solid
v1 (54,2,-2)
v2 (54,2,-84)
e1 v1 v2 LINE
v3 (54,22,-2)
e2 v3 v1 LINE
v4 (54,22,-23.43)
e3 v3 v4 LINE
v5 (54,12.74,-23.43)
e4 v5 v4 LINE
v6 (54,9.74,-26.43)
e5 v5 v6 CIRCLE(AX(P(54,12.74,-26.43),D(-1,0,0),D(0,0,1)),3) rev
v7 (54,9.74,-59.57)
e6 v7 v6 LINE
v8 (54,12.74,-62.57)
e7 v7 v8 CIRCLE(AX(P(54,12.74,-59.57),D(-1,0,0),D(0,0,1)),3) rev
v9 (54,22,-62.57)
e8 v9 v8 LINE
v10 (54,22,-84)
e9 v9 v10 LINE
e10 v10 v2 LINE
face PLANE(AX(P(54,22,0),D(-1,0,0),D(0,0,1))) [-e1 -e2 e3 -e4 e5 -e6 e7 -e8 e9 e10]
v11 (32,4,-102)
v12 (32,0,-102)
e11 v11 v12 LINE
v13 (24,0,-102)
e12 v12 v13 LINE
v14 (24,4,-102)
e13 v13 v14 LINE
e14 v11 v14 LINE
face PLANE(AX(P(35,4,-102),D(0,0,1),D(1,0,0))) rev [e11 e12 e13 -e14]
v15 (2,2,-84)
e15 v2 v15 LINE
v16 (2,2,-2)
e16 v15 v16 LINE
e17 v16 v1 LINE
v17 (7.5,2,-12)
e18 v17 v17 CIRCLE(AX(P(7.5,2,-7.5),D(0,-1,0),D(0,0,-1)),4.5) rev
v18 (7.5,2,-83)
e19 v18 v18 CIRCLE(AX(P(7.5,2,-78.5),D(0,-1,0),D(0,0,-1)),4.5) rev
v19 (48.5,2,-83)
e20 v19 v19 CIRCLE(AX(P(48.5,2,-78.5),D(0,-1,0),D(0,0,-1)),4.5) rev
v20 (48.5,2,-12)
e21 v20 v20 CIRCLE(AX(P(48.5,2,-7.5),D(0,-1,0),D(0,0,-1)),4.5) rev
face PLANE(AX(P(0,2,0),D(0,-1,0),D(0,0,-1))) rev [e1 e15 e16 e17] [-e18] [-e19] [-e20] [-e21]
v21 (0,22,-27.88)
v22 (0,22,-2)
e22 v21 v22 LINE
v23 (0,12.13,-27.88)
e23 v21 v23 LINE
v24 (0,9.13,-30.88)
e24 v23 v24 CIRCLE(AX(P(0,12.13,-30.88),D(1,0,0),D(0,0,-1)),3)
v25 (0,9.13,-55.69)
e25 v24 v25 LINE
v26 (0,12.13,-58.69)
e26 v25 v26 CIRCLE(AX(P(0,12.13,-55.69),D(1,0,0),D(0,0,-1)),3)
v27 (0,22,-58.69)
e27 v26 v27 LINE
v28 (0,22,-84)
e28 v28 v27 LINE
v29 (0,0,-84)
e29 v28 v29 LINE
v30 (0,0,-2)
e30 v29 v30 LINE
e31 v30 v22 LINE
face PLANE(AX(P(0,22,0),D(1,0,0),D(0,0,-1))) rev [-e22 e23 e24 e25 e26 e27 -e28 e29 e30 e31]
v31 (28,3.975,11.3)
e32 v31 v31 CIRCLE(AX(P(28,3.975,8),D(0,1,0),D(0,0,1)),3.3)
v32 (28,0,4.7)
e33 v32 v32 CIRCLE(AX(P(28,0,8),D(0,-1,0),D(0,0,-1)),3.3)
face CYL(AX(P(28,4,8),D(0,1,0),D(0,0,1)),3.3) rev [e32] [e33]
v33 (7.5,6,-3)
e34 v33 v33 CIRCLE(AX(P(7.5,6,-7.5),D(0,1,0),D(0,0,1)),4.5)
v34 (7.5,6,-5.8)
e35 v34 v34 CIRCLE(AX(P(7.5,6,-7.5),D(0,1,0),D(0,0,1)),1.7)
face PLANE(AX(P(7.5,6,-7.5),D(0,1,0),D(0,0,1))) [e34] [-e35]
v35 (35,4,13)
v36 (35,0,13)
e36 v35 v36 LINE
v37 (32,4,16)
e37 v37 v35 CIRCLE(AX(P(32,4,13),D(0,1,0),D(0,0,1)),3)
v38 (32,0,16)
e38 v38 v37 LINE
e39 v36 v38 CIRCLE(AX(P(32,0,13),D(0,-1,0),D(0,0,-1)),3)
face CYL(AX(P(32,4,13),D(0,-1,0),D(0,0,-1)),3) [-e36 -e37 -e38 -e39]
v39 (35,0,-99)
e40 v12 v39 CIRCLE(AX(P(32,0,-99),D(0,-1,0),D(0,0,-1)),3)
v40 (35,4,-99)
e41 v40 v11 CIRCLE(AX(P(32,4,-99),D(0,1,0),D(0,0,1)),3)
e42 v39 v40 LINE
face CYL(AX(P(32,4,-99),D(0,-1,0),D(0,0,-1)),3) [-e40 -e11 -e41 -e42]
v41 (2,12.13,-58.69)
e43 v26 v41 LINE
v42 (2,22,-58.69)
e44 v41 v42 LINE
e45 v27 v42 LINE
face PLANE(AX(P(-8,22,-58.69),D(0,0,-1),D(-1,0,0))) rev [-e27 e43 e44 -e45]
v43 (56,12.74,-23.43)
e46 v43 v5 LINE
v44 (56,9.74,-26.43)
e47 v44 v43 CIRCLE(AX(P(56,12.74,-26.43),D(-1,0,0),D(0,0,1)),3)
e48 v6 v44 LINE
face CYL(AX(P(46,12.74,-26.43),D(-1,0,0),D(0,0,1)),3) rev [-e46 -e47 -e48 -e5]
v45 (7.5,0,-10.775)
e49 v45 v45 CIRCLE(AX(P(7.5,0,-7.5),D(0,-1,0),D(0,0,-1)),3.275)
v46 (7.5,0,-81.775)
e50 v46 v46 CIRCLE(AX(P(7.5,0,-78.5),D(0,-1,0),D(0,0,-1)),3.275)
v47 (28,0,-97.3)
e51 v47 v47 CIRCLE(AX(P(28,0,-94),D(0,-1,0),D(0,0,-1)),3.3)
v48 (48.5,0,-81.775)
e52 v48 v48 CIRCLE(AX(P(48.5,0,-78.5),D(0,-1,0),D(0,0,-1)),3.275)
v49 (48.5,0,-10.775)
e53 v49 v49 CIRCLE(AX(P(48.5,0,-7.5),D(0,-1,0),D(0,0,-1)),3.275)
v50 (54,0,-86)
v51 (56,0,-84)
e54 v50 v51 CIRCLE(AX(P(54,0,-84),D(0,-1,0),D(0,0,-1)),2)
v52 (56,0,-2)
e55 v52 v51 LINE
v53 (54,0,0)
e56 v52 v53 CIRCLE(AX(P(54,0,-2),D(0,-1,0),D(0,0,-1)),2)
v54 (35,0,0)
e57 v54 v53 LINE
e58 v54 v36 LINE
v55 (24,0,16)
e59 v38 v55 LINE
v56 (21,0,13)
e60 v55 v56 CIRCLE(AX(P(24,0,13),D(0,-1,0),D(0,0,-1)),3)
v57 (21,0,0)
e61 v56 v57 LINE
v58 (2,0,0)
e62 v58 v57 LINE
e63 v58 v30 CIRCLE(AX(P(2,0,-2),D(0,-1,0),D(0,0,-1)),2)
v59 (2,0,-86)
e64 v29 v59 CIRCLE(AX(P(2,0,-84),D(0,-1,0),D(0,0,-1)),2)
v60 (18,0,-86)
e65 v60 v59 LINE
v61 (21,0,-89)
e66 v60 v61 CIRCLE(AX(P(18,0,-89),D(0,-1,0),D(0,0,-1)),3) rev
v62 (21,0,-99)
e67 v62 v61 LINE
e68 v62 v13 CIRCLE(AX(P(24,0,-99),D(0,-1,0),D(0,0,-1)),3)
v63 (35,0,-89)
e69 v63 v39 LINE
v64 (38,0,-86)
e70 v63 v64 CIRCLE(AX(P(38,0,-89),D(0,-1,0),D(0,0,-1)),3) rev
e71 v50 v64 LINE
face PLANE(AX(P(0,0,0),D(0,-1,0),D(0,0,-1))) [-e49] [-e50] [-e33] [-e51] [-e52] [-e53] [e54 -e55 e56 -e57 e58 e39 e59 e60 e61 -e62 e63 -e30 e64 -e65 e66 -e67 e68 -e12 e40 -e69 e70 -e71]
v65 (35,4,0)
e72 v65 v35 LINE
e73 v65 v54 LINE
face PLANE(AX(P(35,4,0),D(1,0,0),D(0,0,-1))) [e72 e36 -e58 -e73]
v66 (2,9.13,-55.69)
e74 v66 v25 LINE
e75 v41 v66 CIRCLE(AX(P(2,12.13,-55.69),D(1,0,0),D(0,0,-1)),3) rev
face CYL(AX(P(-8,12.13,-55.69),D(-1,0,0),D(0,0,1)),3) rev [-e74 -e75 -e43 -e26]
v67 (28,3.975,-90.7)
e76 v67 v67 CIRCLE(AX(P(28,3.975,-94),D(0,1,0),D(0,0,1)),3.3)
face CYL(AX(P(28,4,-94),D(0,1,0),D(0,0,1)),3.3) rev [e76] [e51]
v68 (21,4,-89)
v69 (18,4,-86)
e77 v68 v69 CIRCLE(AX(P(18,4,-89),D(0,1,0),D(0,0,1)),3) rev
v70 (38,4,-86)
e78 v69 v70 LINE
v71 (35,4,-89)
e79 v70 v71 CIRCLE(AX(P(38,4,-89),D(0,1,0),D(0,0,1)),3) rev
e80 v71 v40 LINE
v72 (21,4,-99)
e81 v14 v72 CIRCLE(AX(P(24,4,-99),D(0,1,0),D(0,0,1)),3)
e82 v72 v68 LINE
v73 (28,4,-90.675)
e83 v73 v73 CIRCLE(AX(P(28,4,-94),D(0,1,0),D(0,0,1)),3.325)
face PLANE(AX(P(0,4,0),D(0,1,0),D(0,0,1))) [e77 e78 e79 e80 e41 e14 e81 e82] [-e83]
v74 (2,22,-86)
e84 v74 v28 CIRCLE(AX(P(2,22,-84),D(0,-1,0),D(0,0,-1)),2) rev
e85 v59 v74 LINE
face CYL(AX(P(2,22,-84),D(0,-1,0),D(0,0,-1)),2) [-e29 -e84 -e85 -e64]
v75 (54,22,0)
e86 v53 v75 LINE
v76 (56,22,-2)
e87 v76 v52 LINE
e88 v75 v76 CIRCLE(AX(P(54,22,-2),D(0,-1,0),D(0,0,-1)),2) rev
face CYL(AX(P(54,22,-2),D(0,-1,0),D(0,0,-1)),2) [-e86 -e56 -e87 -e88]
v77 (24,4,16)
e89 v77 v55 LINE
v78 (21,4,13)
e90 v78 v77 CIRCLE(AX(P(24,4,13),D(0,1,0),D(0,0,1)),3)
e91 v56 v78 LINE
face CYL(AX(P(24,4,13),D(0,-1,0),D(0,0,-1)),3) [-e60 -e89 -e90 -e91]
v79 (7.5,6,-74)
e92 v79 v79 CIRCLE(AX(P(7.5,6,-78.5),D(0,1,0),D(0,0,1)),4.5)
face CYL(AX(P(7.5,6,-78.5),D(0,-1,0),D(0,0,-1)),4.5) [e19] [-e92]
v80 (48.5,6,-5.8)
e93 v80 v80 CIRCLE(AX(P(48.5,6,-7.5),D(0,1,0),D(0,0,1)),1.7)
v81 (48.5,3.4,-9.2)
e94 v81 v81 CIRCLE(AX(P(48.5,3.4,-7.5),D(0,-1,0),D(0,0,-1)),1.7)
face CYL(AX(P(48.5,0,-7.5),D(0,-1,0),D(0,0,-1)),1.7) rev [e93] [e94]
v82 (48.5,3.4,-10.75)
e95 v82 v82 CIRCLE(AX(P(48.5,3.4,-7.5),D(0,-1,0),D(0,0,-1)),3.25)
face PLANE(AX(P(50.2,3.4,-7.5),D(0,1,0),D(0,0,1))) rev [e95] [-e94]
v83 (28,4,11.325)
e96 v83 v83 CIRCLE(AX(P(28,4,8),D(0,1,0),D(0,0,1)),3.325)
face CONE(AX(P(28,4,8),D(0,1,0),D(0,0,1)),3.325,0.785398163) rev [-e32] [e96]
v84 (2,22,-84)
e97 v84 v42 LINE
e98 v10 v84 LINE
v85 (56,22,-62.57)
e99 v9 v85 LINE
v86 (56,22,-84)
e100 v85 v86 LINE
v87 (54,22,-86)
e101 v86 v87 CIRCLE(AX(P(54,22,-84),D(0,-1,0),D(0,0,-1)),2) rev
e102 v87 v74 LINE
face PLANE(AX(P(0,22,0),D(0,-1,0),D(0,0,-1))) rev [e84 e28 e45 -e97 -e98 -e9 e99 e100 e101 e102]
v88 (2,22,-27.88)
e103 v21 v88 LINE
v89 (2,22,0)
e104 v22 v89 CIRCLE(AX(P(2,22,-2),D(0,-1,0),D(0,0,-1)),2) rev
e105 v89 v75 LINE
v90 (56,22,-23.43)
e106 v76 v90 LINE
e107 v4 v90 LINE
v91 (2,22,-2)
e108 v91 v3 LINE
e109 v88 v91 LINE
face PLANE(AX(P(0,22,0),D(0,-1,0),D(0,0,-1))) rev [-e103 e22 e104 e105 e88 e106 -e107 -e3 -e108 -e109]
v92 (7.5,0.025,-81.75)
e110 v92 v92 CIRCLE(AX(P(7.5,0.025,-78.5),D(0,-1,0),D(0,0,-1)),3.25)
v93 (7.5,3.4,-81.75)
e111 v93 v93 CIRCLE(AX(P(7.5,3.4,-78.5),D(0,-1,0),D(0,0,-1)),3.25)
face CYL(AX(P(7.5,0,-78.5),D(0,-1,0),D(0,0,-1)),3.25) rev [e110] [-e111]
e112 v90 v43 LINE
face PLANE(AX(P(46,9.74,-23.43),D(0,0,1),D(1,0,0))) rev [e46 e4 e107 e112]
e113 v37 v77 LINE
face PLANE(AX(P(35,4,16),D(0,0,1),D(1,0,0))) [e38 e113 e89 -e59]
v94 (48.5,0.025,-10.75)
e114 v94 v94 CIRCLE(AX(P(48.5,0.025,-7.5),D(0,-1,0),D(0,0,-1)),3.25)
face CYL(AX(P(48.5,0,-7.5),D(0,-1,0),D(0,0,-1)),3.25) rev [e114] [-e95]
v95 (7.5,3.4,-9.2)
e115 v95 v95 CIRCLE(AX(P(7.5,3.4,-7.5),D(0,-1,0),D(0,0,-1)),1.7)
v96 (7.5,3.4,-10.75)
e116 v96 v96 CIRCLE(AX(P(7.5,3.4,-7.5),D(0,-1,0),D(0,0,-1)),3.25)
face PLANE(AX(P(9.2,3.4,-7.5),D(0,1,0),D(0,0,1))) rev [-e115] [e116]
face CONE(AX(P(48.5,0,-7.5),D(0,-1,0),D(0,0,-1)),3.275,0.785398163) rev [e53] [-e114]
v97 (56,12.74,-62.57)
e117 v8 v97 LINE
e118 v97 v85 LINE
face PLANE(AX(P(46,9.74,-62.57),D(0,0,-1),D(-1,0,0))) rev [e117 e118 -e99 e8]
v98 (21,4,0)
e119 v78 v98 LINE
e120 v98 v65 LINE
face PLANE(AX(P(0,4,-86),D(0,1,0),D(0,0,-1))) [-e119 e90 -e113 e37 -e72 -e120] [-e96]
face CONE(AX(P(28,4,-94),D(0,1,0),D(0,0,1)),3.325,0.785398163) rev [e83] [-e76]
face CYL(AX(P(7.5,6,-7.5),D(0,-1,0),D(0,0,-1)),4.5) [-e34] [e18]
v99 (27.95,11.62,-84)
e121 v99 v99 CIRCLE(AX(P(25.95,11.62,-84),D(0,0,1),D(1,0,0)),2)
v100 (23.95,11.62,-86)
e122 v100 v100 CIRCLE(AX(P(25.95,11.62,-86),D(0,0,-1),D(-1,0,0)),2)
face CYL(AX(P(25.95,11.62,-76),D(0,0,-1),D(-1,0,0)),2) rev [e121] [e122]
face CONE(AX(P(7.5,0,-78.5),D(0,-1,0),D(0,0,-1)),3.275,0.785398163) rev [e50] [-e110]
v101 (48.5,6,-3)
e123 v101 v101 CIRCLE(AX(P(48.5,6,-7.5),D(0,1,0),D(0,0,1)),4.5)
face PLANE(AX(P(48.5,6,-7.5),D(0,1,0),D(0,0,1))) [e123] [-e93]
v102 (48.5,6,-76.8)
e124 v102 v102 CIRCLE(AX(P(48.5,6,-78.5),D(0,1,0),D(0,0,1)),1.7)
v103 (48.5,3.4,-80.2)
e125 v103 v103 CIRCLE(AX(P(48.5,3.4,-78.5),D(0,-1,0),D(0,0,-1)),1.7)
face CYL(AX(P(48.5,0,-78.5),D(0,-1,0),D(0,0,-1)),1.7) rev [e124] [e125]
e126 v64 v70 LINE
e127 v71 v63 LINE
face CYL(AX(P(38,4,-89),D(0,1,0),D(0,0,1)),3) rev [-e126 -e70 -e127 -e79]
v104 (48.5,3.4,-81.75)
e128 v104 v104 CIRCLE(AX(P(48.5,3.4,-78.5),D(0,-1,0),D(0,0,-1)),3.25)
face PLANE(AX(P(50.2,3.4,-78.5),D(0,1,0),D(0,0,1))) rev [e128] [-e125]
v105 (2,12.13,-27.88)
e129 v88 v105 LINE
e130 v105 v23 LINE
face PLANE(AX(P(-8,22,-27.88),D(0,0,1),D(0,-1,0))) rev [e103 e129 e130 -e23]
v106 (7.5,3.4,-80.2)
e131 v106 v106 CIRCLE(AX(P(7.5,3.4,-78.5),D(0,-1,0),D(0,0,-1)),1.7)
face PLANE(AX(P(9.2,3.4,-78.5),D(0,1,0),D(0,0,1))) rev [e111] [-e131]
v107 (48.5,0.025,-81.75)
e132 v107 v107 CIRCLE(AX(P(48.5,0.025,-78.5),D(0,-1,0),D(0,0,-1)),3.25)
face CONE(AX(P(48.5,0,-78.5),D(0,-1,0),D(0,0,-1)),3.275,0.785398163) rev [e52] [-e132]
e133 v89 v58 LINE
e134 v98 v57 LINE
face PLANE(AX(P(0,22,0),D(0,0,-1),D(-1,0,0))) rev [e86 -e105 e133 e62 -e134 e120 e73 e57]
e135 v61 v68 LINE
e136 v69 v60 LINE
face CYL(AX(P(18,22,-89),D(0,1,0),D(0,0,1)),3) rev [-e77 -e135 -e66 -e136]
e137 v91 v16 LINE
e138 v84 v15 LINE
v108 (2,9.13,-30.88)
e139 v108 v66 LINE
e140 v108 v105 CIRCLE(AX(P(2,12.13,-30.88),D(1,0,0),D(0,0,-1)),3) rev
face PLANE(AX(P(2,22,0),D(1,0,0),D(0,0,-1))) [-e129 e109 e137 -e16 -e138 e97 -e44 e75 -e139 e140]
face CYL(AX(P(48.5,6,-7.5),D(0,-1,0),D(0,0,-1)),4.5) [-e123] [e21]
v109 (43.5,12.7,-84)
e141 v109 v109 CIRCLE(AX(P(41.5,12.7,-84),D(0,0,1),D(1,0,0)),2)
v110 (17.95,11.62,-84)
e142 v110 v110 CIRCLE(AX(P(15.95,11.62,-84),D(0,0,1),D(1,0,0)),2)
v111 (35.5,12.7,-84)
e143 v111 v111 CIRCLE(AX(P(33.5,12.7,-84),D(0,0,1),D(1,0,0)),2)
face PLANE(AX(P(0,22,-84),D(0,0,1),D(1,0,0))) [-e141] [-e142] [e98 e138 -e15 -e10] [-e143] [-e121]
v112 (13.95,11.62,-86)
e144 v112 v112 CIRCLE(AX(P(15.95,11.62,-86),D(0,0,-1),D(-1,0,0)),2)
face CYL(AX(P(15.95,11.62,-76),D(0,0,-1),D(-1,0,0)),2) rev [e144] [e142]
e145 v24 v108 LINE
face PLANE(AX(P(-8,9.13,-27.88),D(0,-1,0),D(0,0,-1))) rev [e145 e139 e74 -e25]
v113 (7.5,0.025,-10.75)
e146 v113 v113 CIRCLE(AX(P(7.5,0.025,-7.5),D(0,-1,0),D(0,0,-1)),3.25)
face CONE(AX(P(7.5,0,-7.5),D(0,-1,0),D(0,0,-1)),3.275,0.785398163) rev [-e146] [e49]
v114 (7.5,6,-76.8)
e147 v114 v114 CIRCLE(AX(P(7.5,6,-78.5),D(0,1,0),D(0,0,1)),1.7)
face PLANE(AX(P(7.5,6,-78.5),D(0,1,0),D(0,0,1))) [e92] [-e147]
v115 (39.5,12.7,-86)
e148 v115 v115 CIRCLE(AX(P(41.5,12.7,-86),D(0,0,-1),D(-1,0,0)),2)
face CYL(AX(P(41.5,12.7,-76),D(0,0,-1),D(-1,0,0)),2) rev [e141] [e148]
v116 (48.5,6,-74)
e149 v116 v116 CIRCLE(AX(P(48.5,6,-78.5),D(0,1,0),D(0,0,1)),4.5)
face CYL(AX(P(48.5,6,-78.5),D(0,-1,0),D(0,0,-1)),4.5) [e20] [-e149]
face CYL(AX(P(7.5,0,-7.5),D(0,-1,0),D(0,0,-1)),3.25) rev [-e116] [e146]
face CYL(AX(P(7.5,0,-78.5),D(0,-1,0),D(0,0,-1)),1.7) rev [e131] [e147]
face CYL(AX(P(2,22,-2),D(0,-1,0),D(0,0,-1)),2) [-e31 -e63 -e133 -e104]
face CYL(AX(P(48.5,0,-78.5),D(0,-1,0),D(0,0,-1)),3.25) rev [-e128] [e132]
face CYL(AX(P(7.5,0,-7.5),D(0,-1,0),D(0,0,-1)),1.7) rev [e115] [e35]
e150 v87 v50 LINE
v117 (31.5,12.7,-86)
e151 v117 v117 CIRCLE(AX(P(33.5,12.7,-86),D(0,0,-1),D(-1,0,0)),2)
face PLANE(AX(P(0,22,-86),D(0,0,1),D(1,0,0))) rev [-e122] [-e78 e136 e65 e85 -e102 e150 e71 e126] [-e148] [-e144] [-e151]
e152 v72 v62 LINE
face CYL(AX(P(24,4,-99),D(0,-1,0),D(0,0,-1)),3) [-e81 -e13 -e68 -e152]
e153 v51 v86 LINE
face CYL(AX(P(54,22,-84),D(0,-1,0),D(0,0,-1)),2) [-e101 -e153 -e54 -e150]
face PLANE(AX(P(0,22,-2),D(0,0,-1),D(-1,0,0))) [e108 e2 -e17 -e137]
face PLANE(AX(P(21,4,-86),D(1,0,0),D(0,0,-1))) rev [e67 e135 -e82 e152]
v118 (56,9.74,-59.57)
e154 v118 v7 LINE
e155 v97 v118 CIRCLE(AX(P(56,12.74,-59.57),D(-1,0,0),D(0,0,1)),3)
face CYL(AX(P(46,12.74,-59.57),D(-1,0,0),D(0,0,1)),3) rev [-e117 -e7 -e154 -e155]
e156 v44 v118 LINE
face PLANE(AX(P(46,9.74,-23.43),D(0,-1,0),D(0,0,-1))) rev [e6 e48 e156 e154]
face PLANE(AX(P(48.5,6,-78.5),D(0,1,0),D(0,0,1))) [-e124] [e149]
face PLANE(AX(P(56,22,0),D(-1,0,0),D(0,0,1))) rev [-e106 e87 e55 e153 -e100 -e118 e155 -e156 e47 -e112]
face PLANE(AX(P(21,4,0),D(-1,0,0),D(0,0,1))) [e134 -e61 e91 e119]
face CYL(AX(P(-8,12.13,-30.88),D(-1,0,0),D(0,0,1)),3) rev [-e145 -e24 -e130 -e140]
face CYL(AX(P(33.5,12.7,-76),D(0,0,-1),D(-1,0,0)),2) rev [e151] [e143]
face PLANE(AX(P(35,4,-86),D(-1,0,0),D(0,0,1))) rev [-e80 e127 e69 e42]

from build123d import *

# Parameters (mm, degrees)
SKIZZE1_W                                    = 56
SKIZZE1_H                                    = 86
AUFSATZ_LINEAR_AUSTRAGEN1_DEPTH              = 22
WANDUNG1_T                                   = -2
SKIZZE2_R                                    = 4.5
AUFSATZ_LINEAR_AUSTRAGEN2_DEPTH              = 4
VERRUNDUNG1_R                                = 2
STIRNSENKUNG_F_R_M3_ZYLINDERSCHRAUBE_2_COUNT = 2
STIRNSENKUNG_F_R_M3_ZYLINDERSCHRAUBE_2_PITCH = 81.987803971
STIRNSENKUNG_F_R_M3_ZYLINDERSCHRAUBE_3_COUNT = 2
STIRNSENKUNG_F_R_M3_ZYLINDERSCHRAUBE_3_PITCH = 71
STIRNSENKUNG_F_R_M3_ZYLINDERSCHRAUBE_4_COUNT = 2
STIRNSENKUNG_F_R_M3_ZYLINDERSCHRAUBE_4_PITCH = 41
SKIZZE8_W                                    = 39.14
SKIZZE8_H                                    = 12.26
SCHNITT_LINEAR_AUSTRAGEN3_DEPTH              = 10
VERRUNDUNG2_R                                = 3
SKIZZE9_W                                    = 30.81
SKIZZE9_H                                    = 12.87
SCHNITT_LINEAR_AUSTRAGEN4_DEPTH              = 10
VERRUNDUNG3_R                                = 3
SKIZZE10_R                                   = 2
SCHNITT_LINEAR_AUSTRAGEN5_DEPTH              = 10
SKIZZE11_W                                   = 14
SKIZZE11_H                                   = 16
AUFSATZ_LINEAR_AUSTRAGEN3_DEPTH              = 4
VERRUNDUNG4_R                                = 3
SPIEGELN1_OUTLINE_R                          = 3.3
SPIEGELN1_DEPTH                              = 4


with BuildPart() as part:
    # Skizze1 → Aufsatz-Linear austragen1 (new body)
    with BuildSketch(Plane(origin=(0, 0, 0), x_dir=(1, 0, 0), z_dir=(0, 1, 0))):
        with Locations((28, 43)):
            Rectangle(SKIZZE1_W, SKIZZE1_H)
    extrude(amount=AUFSATZ_LINEAR_AUSTRAGEN1_DEPTH)

    # Wandung1
    wandung1_openings = [part.faces().sort_by_distance(p)[0] for p in [
        (28, 22, -43),
    ]]
    offset(amount=WANDUNG1_T, openings=wandung1_openings, kind=Kind.INTERSECTION)

    # Skizze2 → Aufsatz-Linear austragen2 (add)
    with BuildSketch(Plane(origin=(0, 2, 0), x_dir=(1, 0, 0), z_dir=(0, 1, 0))):
        with Locations(Location((7.5, 7.5, 0), (0, 0, 90))):
            Circle(SKIZZE2_R)
        with Locations(Location((48.5, 7.5, 0), (0, 0, 90))):
            Circle(SKIZZE2_R)
        with Locations(Location((48.5, 78.5, 0), (0, 0, 90))):
            Circle(SKIZZE2_R)
        with Locations(Location((7.5, 78.5, 0), (0, 0, 90))):
            Circle(SKIZZE2_R)
    extrude(amount=AUFSATZ_LINEAR_AUSTRAGEN2_DEPTH)

    # Verrundung1
    verrundung1_edges = [part.edges().sort_by_distance(p)[0] for p in [
        (0, 11, -86),
        (56, 11, -86),
        (56, 11, 0),
        (0, 11, 0),
    ]]
    fillet(verrundung1_edges, radius=VERRUNDUNG1_R)

    # Skizze6 → Stirnsenkung für M3 Zylinderschraube mit Innensechskant1 (revolve, cut)
    with BuildSketch(Plane(origin=(48.5, 0, -7.5), x_dir=(0, 0, -1), z_dir=(1, 0, 0))):
        Polygon((0, 0), (0, 15.021463052), (1.7, 14), (1.7, 3.4), (3.25, 3.4), (3.25, 0.025), (3.275, 0), align=None)
    stirnsenkung_f_r_m3_zylinderschraube_mit = revolve(axis=Axis((48.5, -6.35, -7.5), (0, 1, 0)), mode=Mode.SUBTRACT)

    # Stirnsenkung f_r M3 Zylinderschraube 2: Stirnsenkung für M3 Zylinderschraube mit Innensechskant1 ×2
    with Locations(*[Vector(-0.5000743770922673, 0, -0.865982457891487) * (i * STIRNSENKUNG_F_R_M3_ZYLINDERSCHRAUBE_2_PITCH) for i in range(1, STIRNSENKUNG_F_R_M3_ZYLINDERSCHRAUBE_2_COUNT)]):
        add(stirnsenkung_f_r_m3_zylinderschraube_mit, mode=Mode.SUBTRACT)

    # Stirnsenkung f_r M3 Zylinderschraube 3: Stirnsenkung für M3 Zylinderschraube mit Innensechskant1 ×2
    with Locations(*[(0, 0, -i * STIRNSENKUNG_F_R_M3_ZYLINDERSCHRAUBE_3_PITCH) for i in range(1, STIRNSENKUNG_F_R_M3_ZYLINDERSCHRAUBE_3_COUNT)]):
        add(stirnsenkung_f_r_m3_zylinderschraube_mit, mode=Mode.SUBTRACT)

    # Stirnsenkung f_r M3 Zylinderschraube 4: Stirnsenkung für M3 Zylinderschraube mit Innensechskant1 ×2
    with Locations(*[(-i * STIRNSENKUNG_F_R_M3_ZYLINDERSCHRAUBE_4_PITCH, 0, 0) for i in range(1, STIRNSENKUNG_F_R_M3_ZYLINDERSCHRAUBE_4_COUNT)]):
        add(stirnsenkung_f_r_m3_zylinderschraube_mit, mode=Mode.SUBTRACT)

    # Skizze8 → Schnitt-Linear austragen3 (cut)
    with BuildSketch(Plane(origin=(56, 0, 0), x_dir=(0, 0, -1), z_dir=(1, 0, 0))):
        with Locations((43, 15.87)):
            Rectangle(SKIZZE8_W, SKIZZE8_H)
    extrude(amount=-SCHNITT_LINEAR_AUSTRAGEN3_DEPTH, mode=Mode.SUBTRACT)

    # Verrundung2
    verrundung2_edges = [part.edges().sort_by_distance(p)[0] for p in [
        (55, 9.74, -23.43),
        (55, 9.74, -62.57),
    ]]
    fillet(verrundung2_edges, radius=VERRUNDUNG2_R)

    # Skizze9 → Schnitt-Linear austragen4 (cut)
    with BuildSketch(Plane(origin=(2, 0, 0), x_dir=(0, 0, -1), z_dir=(1, 0, 0))):
        with Locations((43.285, 15.565)):
            Rectangle(SKIZZE9_W, SKIZZE9_H)
    extrude(amount=-SCHNITT_LINEAR_AUSTRAGEN4_DEPTH, mode=Mode.SUBTRACT)

    # Verrundung3
    verrundung3_edges = [part.edges().sort_by_distance(p)[0] for p in [
        (1, 9.13, -27.88),
        (1, 9.13, -58.69),
    ]]
    fillet(verrundung3_edges, radius=VERRUNDUNG3_R)

    # Skizze10 → Schnitt-Linear austragen5 (cut)
    with BuildSketch(Plane(origin=(0, 0, -86), x_dir=(-1, 0, 0), z_dir=(0, 0, -1))):
        with Locations((-41.5, 12.7)):
            Circle(SKIZZE10_R)
        with Locations((-33.5, 12.7)):
            Circle(SKIZZE10_R)
        with Locations((-25.95, 11.62)):
            Circle(SKIZZE10_R)
        with Locations((-15.95, 11.62)):
            Circle(SKIZZE10_R)
    extrude(amount=-SCHNITT_LINEAR_AUSTRAGEN5_DEPTH, mode=Mode.SUBTRACT)

    # Skizze11 → Aufsatz-Linear austragen3 (add)
    with BuildSketch(Plane(origin=(0, 0, 0), x_dir=(1, 0, 0), z_dir=(0, 1, 0))):
        with Locations((28, 94)):
            Rectangle(SKIZZE11_W, SKIZZE11_H)
    extrude(amount=AUFSATZ_LINEAR_AUSTRAGEN3_DEPTH)

    # Verrundung4
    verrundung4_edges = [part.edges().sort_by_distance(p)[0] for p in [
        (35, 2, -86),
        (35, 2, -102),
        (21, 2, -102),
        (21, 2, -86),
    ]]
    fillet(verrundung4_edges, radius=VERRUNDUNG4_R)

    # Skizze13 → Durchgangsloch für M61 (revolve, cut)
    with BuildSketch(Plane(origin=(28, 4, -94), x_dir=(0, 0, 1), z_dir=(1, 0, 0))):
        Polygon((0, 0), (0, 15.982840043), (3.3, 14), (3.3, 0.025), (3.325, 0), align=None)
    revolve(axis=Axis((28, 10.35, -94), (0, -1, 0)), mode=Mode.SUBTRACT)

    # Spiegeln1: read off the stored shape, not the designer's step
    # Spiegeln1 outline → Spiegeln1 (add)
    with BuildSketch(Plane(origin=(0, 0, 0), x_dir=(1, 0, 0), z_dir=(0, 1, 0))):
        with BuildLine():
            ThreePointArc((32, -16), (34.121320344, -15.121320344), (35, -13))
            Line((35, -13), (35, 0))
            Line((35, 0), (21, 0))
            Line((21, 0), (21, -13))
            ThreePointArc((21, -13), (21.878679656, -15.121320344), (24, -16))
            Line((24, -16), (32, -16))
        make_face()
        with Locations((28, -8)):
            Circle(SPIEGELN1_OUTLINE_R, mode=Mode.SUBTRACT)
    extrude(amount=SPIEGELN1_DEPTH)

    # Spiegeln1 2 outline → Spiegeln1 2 (revolve, cut)
    with BuildSketch(Plane(origin=(28, 0, 8), x_dir=(1, 0, 0), z_dir=(0, 0, 1))):
        Polygon((3.3, 4), (3.3, 3.975), (3.325, 4), align=None)
    revolve(axis=Axis((28, 0, 8), (0, 1, 0)), mode=Mode.SUBTRACT)


solid = part.part
